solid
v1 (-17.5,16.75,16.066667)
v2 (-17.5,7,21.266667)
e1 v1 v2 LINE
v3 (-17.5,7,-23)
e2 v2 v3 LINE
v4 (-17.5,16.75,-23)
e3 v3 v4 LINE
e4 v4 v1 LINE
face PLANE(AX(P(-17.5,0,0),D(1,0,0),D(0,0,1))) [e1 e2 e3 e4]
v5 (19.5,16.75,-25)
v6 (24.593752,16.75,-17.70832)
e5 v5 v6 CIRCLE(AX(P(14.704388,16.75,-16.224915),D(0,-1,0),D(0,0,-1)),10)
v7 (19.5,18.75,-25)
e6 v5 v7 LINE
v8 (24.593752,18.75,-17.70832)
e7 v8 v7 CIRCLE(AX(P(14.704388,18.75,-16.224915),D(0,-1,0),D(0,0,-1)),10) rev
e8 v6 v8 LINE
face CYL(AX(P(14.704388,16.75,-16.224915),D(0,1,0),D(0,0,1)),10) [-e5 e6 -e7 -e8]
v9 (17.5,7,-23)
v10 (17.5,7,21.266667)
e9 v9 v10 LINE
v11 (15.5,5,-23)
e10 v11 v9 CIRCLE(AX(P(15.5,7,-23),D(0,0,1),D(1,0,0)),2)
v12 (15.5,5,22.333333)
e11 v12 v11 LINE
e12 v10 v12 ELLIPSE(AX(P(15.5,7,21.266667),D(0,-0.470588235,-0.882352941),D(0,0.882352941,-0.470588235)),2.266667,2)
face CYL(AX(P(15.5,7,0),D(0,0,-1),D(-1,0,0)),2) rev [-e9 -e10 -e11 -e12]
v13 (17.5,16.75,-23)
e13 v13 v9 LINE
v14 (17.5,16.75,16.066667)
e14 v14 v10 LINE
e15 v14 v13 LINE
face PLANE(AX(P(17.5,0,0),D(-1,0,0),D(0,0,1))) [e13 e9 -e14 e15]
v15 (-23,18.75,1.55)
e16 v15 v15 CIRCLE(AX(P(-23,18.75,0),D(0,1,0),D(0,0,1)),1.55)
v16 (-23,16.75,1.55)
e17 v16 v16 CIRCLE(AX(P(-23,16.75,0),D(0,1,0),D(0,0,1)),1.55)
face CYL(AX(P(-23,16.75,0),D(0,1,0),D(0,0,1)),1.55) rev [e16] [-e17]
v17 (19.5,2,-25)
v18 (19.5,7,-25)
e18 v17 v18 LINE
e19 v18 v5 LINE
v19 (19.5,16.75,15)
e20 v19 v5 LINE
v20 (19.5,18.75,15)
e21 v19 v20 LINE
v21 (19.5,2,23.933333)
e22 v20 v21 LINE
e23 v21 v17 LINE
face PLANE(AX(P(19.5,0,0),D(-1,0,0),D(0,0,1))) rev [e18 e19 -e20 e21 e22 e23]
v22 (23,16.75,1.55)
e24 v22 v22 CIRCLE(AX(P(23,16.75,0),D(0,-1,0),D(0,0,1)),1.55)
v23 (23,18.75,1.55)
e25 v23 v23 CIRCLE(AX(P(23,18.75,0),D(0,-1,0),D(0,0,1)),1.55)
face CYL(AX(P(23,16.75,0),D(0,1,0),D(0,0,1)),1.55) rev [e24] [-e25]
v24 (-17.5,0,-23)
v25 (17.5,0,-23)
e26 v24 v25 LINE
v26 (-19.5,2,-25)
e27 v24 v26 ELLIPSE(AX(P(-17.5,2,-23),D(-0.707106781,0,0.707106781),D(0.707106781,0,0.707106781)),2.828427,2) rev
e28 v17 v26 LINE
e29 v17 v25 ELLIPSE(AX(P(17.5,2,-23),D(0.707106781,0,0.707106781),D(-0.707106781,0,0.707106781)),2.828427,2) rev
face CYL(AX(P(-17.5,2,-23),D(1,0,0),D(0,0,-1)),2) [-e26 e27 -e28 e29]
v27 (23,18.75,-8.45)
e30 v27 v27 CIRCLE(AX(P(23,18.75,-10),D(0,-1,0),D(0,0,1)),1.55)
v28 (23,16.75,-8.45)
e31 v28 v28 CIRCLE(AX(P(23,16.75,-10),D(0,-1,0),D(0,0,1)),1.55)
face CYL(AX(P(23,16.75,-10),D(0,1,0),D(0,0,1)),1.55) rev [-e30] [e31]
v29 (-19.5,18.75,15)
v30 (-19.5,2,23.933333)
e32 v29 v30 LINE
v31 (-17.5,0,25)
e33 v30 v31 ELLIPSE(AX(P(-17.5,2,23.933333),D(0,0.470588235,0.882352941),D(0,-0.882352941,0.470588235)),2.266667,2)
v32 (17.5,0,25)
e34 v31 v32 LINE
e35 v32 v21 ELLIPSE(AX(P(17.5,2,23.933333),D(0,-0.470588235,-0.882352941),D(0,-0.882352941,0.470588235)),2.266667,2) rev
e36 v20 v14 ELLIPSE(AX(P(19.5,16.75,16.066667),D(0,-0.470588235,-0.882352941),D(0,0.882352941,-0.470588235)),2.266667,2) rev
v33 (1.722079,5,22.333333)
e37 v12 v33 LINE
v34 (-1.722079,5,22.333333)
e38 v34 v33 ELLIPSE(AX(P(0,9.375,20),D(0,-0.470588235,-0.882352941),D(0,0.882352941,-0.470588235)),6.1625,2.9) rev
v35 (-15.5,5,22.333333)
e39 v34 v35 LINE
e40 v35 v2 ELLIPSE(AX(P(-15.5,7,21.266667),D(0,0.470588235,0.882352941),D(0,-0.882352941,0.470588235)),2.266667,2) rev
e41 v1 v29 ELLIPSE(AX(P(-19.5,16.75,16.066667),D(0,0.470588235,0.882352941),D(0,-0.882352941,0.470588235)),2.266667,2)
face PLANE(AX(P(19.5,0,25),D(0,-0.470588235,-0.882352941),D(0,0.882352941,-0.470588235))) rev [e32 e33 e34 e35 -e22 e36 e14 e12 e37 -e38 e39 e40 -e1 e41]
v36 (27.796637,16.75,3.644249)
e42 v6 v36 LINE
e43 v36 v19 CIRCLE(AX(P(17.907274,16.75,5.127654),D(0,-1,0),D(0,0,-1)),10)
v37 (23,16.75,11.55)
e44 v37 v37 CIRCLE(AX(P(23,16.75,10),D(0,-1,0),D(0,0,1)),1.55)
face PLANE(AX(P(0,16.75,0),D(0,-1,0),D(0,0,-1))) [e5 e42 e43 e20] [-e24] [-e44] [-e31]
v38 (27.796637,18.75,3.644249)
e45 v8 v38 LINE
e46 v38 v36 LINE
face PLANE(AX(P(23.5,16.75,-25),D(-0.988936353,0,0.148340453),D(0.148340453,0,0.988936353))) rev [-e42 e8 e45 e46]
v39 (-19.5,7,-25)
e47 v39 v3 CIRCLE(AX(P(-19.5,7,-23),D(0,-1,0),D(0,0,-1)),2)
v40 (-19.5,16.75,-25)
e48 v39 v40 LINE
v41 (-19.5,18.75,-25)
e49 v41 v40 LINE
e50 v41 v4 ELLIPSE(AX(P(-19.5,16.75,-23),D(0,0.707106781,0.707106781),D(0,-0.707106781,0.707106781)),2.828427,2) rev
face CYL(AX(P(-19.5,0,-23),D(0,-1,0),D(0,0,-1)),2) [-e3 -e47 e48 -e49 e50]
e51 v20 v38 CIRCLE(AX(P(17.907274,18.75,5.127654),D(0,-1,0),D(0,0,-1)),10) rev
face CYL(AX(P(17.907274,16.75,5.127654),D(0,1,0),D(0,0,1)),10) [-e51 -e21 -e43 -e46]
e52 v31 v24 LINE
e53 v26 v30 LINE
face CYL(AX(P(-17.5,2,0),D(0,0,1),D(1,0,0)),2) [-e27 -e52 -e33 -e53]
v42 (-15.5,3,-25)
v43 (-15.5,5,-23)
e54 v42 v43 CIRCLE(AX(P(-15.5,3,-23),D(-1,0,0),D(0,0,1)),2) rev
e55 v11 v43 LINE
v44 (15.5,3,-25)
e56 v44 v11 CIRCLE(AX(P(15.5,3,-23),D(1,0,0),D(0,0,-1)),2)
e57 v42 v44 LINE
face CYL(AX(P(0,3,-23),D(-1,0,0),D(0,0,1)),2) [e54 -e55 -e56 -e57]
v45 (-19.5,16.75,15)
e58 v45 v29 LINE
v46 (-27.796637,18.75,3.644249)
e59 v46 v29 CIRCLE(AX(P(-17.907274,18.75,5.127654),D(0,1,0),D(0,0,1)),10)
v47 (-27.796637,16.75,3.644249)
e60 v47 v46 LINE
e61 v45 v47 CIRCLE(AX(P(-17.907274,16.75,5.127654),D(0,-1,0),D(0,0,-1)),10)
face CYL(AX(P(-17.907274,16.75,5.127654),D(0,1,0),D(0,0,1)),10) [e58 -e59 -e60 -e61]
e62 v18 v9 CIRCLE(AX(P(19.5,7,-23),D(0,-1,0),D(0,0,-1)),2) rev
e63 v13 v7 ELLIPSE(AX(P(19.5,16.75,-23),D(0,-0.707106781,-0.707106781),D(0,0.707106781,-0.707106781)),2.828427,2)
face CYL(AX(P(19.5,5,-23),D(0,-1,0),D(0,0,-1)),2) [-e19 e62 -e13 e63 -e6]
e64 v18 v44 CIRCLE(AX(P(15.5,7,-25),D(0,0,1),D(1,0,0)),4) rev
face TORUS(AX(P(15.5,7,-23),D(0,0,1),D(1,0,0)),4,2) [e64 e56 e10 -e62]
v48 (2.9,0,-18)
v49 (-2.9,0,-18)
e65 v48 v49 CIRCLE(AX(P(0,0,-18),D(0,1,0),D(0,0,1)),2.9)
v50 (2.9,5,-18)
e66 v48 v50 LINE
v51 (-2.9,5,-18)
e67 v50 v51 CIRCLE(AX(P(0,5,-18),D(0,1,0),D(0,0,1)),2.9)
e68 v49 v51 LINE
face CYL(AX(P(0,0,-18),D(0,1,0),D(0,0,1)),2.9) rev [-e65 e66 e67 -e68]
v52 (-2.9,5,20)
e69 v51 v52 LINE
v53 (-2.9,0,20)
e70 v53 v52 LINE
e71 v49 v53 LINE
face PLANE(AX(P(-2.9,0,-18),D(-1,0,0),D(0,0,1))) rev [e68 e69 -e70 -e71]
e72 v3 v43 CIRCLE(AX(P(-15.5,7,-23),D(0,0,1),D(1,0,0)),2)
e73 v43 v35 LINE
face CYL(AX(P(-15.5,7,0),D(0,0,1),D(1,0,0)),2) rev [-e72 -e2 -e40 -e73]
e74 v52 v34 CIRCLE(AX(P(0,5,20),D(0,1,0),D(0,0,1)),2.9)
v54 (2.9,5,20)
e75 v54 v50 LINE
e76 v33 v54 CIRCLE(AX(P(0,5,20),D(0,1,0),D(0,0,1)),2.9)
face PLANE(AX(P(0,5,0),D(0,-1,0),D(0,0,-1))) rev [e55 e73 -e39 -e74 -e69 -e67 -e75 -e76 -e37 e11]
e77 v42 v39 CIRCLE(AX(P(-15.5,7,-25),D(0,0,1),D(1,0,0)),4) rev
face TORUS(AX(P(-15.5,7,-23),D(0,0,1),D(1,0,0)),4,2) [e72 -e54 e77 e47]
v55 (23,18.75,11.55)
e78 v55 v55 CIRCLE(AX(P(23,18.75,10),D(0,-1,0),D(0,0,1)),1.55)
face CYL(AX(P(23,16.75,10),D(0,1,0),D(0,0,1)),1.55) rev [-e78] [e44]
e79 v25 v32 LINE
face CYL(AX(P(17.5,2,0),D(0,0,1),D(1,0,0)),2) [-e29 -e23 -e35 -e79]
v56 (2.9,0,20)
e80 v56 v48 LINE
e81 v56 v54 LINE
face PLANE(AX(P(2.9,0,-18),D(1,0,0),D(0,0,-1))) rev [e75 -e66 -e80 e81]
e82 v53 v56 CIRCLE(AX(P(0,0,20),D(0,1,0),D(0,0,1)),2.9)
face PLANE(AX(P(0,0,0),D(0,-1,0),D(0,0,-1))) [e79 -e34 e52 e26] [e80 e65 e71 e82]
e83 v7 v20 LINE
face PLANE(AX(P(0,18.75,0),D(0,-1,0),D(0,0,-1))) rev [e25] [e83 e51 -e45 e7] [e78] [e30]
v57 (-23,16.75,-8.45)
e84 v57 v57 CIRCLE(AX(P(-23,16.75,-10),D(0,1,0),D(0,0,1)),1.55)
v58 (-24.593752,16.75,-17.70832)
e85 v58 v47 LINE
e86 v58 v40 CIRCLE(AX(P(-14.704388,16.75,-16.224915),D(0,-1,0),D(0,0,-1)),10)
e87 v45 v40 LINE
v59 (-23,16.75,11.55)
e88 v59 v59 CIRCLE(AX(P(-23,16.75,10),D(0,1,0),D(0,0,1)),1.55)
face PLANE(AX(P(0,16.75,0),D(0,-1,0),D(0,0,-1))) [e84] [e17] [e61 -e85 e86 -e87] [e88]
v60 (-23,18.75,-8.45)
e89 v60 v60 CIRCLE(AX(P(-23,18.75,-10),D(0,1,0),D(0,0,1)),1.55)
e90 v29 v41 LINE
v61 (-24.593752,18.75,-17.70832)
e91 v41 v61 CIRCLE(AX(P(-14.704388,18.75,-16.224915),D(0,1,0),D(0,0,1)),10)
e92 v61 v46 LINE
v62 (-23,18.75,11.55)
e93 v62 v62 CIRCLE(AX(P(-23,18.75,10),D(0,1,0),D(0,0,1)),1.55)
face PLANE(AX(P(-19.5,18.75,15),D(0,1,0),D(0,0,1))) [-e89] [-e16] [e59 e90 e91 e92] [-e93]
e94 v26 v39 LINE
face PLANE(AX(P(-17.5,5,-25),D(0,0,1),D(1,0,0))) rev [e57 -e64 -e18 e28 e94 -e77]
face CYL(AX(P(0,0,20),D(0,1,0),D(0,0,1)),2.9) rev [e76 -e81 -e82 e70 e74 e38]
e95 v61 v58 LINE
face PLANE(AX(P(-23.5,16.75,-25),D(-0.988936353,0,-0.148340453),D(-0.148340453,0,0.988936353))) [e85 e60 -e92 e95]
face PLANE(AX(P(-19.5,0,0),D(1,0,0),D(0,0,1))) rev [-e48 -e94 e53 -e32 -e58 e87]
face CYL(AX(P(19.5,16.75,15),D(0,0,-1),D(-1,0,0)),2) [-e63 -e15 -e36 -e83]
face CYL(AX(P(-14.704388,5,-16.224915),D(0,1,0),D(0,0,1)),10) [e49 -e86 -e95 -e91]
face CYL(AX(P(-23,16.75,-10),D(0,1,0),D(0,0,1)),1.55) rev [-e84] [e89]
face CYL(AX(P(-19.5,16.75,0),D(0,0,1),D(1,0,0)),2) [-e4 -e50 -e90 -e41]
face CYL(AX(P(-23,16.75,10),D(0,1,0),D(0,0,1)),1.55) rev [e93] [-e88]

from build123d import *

# Parameters (mm, degrees)
SKETCH2_W           = 35
SKETCH2_H           = 50
BOSS_EXTRUDE1_DEPTH = 5
BOSS_EXTRUDE2_DEPTH = 2
SKETCH4_R           = 1.55
BOSS_EXTRUDE3_DEPTH = 2
FILLET1_R           = 2
FILLET2_R           = 10
CUT_EXTRUDE1_DEPTH  = 40.91088123
CUT_EXTRUDE2_DEPTH  = 56.121529602


# Some blends are built 0.0001 mm under size
with BuildPart() as part:
    # Sketch2 → Boss-Extrude1 (new body)
    with BuildSketch(Plane(origin=(0, 0, 0), x_dir=(1, 0, 0), z_dir=(0, 1, 0))):
        Rectangle(SKETCH2_W, SKETCH2_H)
    extrude(amount=BOSS_EXTRUDE1_DEPTH)

    # Sketch3 → Boss-Extrude2 (add)
    with BuildSketch(Plane(origin=(17.5, 0, 0), x_dir=(0, 0, -1), z_dir=(1, 0, 0))):
        Polygon((-25, 0), (-15, 18.75), (25, 18.75), (25, 0), align=None)
    boss_extrude2 = extrude(amount=BOSS_EXTRUDE2_DEPTH)

    # Mirror1: Boss-Extrude2 across plane
    add(boss_extrude2.mirror(Plane(origin=(0, 0, 0), x_dir=(0, 0, 1), z_dir=(1, 0, 0))))

    # Sketch4 → Boss-Extrude3 (add)
    with BuildSketch(Plane(origin=(0, 18.75, 0), x_dir=(1, 0, 0), z_dir=(0, 1, 0))):
        Polygon((-19.5, -15), (-29.5, -15), (-23.5, 25), (-19.5, 25), align=None)
        with Locations(Location((-23, -10, 0), (0, 0, 270))):
            Circle(SKETCH4_R, mode=Mode.SUBTRACT)
        with Locations(Location((-23, 0, 0), (0, 0, 270))):
            Circle(SKETCH4_R, mode=Mode.SUBTRACT)
        with Locations(Location((-23, 10, 0), (0, 0, 270))):
            Circle(SKETCH4_R, mode=Mode.SUBTRACT)
    boss_extrude3 = extrude(amount=-BOSS_EXTRUDE3_DEPTH)

    # Fillet1
    fillet1_edges = [part.edges().sort_by_distance(p)[0] for p in [
        (-17.5, 5, -1.333333333),
        (17.5, 5, -1.333333333),
        (17.5, 18.75, -5),
        (19.5, 0, 0),
        (-17.5, 11.875, -25),
        (-17.5, 18.75, -5),
        (-19.5, 0, 0),
        (17.5, 11.875, -25),
        (0, 0, -25),
        (0, 5, -25),
    ]]
    fillet(fillet1_edges, radius=FILLET1_R - 0.0001)  # a hair under: the kernel refuses the full size

    # Mirror2: Boss-Extrude3 across plane
    add(boss_extrude3.mirror(Plane(origin=(0, 0, 0), x_dir=(0, 0, 1), z_dir=(1, 0, 0))))

    # Fillet2
    # the kernel refuses this fillet: 10 mm, written as the material it takes off along each edge
    with BuildSketch(Plane(origin=(-29.5, 47.456981223, 15), x_dir=(1, 0, 0), z_dir=(0, -1, 0))) as fillet2_piece_1:
        with BuildLine():
            CenterArc((11.592726167, -9.872346396), FILLET2_R, 99.164678829, 89.366086781)
            Line((1.703362639, -11.355750925), (0, 0))
            Line((0, 0), (10, 0))
        make_face()
    extrude(amount=59.413962446, mode=Mode.SUBTRACT)
    with BuildSketch(Plane(origin=(29.5, 47.456981223, 15), x_dir=(-0.1483404529302447, 0, -0.9889363528682975), z_dir=(0, -1, 0))) as fillet2_piece_2:
        with BuildLine():
            CenterArc((11.482792489, -10), FILLET2_R, 90, 89.366086781)
            Line((1.483404529, -9.889363529), (0, 0))
            Line((0, 0), (11.482792489, 0))
        make_face()
    extrude(amount=59.413962446, mode=Mode.SUBTRACT)
    with BuildSketch(Plane(origin=(-23.5, 37.183288466, -25), x_dir=(1.0, 0, 1.2229911091485247e-12), z_dir=(0, -1, 0))) as fillet2_piece_3:
        with BuildLine():
            CenterArc((8.795602585, 8.775144156), FILLET2_R, 188.53076561, 52.813201583)
            Line((-1.093760944, 7.291739627), (0, 0))
            Line((0, 0), (4.0001, 0))
        make_face()
    extrude(amount=38.866576932, mode=Mode.SUBTRACT)
    with BuildSketch(Plane(origin=(23.5, 37.183288466, -25), x_dir=(-1.0, 0, 1.2229911091485247e-12), z_dir=(0, -1, 0))) as fillet2_piece_4:
        with BuildLine():
            CenterArc((8.795602585, -8.775144156), FILLET2_R, 118.656032807, 52.813201583)
            Line((-1.093760944, -7.291739627), (0, 0))
            Line((0, 0), (4.0001, 0))
        make_face()
    extrude(amount=38.866576932, mode=Mode.SUBTRACT)

    # Sketch5 → Cut-Extrude1 (cut, through all)
    with BuildSketch(Plane(origin=(0, 5, 0), x_dir=(1, 0, 0), z_dir=(0, 1, 0))):
        with BuildLine():
            Line((2.9, 18), (2.9, -20))
            ThreePointArc((2.9, -20), (0, -22.9), (-2.9, -20))
            Line((-2.9, -20), (-2.9, 18))
            ThreePointArc((-2.9, 18), (0, 20.9), (2.9, 18))
        make_face()
    extrude(amount=-CUT_EXTRUDE1_DEPTH, mode=Mode.SUBTRACT)

    # Sketch6 → Cut-Extrude2 (cut, through all)
    with BuildSketch(Plane.ZY.offset(17.5)):
        Polygon((25, 5), (22.333333333, 5), (25, 0), align=None)
    extrude(amount=-CUT_EXTRUDE2_DEPTH, mode=Mode.SUBTRACT)


solid = part.part
